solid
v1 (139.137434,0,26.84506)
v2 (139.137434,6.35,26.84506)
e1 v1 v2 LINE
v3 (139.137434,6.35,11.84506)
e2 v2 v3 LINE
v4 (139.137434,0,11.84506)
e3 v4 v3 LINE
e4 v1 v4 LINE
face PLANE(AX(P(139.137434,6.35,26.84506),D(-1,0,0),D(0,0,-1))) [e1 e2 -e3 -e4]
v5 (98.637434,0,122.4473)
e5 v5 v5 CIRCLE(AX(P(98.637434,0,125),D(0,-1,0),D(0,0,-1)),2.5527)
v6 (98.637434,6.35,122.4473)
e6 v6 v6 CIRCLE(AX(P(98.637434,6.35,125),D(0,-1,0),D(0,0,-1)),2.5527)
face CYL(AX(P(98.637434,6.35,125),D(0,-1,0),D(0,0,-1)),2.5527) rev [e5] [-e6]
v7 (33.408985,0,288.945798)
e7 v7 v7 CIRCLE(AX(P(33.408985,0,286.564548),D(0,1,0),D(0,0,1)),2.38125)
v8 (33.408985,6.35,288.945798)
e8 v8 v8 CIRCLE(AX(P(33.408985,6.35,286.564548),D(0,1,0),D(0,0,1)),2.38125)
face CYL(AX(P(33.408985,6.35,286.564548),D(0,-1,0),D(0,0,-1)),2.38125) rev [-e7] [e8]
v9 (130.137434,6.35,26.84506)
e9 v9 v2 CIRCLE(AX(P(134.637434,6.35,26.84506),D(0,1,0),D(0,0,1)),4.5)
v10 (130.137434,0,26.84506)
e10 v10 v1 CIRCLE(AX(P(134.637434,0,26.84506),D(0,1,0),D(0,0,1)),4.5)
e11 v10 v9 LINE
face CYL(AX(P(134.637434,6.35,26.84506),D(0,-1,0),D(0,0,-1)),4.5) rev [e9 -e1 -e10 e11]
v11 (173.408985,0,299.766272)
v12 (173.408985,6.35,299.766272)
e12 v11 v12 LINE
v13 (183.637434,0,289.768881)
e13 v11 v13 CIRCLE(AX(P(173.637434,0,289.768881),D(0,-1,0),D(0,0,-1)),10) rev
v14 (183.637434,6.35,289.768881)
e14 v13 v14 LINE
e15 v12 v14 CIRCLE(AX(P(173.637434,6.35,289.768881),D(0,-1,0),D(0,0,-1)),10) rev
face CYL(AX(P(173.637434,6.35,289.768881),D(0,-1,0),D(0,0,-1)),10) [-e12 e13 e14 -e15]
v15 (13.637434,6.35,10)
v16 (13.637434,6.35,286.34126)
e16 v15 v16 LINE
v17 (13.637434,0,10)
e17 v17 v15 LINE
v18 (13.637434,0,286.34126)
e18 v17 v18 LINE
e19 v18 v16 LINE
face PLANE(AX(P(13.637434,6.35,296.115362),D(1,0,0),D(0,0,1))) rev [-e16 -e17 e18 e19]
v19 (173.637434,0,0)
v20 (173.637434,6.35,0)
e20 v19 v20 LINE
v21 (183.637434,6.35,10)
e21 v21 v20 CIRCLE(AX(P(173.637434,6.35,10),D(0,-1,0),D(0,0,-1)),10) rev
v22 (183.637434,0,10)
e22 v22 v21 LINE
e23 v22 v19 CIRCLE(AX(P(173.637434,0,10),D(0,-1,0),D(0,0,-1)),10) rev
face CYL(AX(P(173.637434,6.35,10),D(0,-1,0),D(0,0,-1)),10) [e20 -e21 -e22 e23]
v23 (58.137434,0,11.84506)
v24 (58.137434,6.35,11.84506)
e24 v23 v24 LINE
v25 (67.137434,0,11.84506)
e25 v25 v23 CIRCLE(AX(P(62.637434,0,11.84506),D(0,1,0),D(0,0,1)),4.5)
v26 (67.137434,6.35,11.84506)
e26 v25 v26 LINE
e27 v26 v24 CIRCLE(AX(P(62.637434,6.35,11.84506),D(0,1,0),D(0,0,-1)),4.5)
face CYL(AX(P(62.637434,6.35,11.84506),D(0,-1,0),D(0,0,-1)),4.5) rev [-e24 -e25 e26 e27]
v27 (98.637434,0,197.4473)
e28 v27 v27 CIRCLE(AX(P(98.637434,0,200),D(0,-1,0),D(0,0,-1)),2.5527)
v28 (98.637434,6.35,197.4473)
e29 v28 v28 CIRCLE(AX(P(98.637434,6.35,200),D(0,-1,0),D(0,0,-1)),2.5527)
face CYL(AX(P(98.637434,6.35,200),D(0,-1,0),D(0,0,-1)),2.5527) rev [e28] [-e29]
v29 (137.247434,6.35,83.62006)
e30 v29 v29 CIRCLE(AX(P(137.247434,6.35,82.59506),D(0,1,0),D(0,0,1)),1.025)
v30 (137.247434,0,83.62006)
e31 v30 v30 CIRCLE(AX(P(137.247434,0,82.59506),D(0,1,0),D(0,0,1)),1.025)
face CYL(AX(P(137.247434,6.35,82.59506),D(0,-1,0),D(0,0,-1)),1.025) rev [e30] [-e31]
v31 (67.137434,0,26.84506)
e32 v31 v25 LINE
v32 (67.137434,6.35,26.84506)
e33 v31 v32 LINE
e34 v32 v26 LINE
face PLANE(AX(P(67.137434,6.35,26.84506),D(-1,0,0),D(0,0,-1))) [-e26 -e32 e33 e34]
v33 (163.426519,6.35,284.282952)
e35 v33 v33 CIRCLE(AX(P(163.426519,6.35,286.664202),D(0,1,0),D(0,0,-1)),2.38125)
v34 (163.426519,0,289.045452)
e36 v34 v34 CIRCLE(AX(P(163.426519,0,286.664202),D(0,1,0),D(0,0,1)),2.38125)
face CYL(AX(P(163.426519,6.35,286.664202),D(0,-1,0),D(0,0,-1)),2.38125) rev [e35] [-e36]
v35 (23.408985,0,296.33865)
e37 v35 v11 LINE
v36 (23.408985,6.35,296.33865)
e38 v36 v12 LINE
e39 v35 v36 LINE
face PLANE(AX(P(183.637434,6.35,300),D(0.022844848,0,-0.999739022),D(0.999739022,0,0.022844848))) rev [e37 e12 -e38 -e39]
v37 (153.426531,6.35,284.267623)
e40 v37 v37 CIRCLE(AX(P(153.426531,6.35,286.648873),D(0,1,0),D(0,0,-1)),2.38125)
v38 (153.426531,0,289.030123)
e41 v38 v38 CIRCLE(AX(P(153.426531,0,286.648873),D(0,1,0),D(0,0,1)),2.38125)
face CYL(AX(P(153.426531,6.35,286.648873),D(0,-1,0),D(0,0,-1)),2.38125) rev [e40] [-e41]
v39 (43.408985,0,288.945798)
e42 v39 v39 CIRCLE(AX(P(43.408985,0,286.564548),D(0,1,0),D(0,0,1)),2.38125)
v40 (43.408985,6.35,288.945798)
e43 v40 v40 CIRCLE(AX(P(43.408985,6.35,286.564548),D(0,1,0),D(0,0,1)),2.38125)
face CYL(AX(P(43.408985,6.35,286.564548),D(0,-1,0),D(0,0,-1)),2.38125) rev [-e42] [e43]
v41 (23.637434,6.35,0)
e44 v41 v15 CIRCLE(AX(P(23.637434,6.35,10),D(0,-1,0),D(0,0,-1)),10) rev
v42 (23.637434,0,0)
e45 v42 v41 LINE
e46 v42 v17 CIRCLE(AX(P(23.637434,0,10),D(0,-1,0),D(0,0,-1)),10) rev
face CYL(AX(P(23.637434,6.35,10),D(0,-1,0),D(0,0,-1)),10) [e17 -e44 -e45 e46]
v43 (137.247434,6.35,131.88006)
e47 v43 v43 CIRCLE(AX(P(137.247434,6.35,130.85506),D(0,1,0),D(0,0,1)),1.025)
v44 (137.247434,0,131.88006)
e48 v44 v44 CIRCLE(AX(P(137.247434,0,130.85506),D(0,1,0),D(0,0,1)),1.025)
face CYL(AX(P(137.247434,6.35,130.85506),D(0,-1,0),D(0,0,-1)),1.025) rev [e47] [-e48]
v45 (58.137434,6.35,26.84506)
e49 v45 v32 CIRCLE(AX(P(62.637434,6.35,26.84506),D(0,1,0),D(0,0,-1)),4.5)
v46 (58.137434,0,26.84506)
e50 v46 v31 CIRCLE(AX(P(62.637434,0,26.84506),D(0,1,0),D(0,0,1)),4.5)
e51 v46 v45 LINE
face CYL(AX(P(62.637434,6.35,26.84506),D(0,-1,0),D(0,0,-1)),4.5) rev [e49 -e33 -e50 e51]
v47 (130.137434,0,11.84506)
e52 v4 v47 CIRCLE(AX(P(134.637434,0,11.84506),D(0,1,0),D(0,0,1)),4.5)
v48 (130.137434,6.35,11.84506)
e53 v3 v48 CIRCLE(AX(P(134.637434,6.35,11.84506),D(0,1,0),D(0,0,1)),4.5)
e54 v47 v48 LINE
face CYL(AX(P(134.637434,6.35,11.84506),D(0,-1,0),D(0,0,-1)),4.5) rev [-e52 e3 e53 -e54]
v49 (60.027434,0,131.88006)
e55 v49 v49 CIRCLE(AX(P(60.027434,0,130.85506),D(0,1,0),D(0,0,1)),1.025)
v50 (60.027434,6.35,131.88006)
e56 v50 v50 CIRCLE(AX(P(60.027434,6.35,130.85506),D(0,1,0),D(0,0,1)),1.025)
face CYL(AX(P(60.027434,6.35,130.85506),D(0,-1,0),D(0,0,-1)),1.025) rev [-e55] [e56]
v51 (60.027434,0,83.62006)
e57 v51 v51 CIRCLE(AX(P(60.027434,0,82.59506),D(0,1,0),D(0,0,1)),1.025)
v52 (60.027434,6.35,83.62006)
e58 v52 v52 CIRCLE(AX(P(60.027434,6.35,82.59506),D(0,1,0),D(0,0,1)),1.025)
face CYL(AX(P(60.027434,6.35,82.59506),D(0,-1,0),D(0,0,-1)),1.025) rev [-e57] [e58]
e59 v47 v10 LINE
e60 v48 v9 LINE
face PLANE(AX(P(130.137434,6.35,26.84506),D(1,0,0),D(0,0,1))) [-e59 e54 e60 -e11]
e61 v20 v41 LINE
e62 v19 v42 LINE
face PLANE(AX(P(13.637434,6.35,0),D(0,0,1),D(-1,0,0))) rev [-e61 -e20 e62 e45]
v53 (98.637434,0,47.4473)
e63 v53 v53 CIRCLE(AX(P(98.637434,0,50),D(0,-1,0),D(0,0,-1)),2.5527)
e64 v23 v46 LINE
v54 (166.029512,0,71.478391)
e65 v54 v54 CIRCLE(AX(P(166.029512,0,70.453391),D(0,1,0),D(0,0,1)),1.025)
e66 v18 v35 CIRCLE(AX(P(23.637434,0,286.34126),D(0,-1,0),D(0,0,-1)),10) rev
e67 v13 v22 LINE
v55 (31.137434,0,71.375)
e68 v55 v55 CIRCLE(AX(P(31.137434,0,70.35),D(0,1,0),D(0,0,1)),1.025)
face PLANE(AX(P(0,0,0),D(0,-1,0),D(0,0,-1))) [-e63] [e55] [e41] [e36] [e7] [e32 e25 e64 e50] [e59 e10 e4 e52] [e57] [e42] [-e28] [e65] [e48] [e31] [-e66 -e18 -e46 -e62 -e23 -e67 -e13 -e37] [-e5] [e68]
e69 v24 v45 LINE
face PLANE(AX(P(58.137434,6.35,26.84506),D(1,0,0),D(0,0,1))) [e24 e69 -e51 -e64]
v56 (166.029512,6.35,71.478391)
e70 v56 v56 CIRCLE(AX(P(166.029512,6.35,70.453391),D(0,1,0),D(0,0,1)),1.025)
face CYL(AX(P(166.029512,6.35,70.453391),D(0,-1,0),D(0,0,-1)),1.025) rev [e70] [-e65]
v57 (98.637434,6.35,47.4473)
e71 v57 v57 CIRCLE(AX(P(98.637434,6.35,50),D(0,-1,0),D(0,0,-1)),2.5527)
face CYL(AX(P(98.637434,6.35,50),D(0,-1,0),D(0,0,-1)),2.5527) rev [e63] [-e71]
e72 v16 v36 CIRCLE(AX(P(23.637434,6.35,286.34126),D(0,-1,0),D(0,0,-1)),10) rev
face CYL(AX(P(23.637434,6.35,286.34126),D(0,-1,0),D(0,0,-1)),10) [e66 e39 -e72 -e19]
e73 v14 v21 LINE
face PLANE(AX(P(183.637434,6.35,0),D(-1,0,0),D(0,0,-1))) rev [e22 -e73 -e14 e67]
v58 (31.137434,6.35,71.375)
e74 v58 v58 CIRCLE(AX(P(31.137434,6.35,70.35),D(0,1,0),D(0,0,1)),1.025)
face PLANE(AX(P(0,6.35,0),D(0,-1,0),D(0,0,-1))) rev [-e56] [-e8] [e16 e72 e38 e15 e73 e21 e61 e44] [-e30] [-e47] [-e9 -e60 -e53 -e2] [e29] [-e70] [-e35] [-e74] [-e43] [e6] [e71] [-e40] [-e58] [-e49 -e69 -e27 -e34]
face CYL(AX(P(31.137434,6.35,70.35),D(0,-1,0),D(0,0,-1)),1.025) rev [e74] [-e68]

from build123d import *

# Parameters (mm, degrees)
PLATE_DEPTH                          = 6.35
FILLET1_R                            = 10
TRIPOD_SOCKET_TAP_DRILL_FOR_1_4_20_D = 5.1054
CAMERA_MOUNT_SCREW_CLEARANCE_DEPTH   = 352.602633461
ALIGNMENT_TAP_DRILL_FOR_M2_5_D       = 2.05
CLAMP_TAP_DRILL_FOR_M2_5_D           = 2.05
SKETCH11_R                           = 2.38125
CABLE_TIES_HOLES_DEPTH               = 352.602633461


with BuildPart() as part:
    # Sketch1 → plate (new body)
    with BuildSketch(Plane(origin=(0, 0, 0), x_dir=(1, 0, 0), z_dir=(0, 1, 0))):
        Polygon((13.637433785, 0), (183.637433785, 0), (183.637433785, -300), (13.637433785, -296.115361978), align=None)
    extrude(amount=PLATE_DEPTH)

    # Fillet1
    fillet1_edges = [part.edges().sort_by_distance(p)[0] for p in [
        (13.637433785, 3.175, 0),
        (183.637433785, 3.175, 0),
        (183.637433785, 3.175, 300),
        (13.637433785, 3.175, 296.115361978),
    ]]
    fillet(fillet1_edges, radius=FILLET1_R)

    # tripod socket Tap Drill for 1/4-20 (through all)
    with Locations(Plane(origin=(0, 0, 0), x_dir=(-1, 0, 0), z_dir=(0, -1, 0))):
        with Locations((-98.637433785, -50), (-98.637433785, -125), (-98.637433785, -200)):
            Hole(TRIPOD_SOCKET_TAP_DRILL_FOR_1_4_20_D / 2)

    # Sketch6 → camera mount screw clearance (cut, through all)
    with BuildSketch(Plane(origin=(0, 6.35, 0), x_dir=(1, 0, 0), z_dir=(0, 1, 0))):
        with BuildLine():
            Line((130.137433785, -26.845059814), (130.137433785, -11.845059814))
            ThreePointArc((130.137433785, -11.845059814), (134.637433785, -7.345059814), (139.137433785, -11.845059814))
            Line((139.137433785, -11.845059814), (139.137433785, -26.845059814))
            ThreePointArc((139.137433785, -26.845059814), (134.637433785, -31.345059814), (130.137433785, -26.845059814))
        make_face()
        with BuildLine():
            Line((58.137433785, -26.845059814), (58.137433785, -11.845059814))
            ThreePointArc((58.137433785, -11.845059814), (62.637433785, -7.345059814), (67.137433785, -11.845059814))
            Line((67.137433785, -11.845059814), (67.137433785, -26.845059814))
            ThreePointArc((67.137433785, -26.845059814), (62.637433785, -31.345059814), (58.137433785, -26.845059814))
        make_face()
    extrude(amount=-CAMERA_MOUNT_SCREW_CLEARANCE_DEPTH, mode=Mode.SUBTRACT)

    # alignment Tap Drill for M2.5 (through all)
    with Locations(Plane(origin=(0, 6.35, 0), x_dir=(1, 0, 0), z_dir=(0, 1, 0))):
        with Locations((60.027433785, -82.595059814), (137.247433785, -82.595059814), (137.247433785, -130.855059814), (60.027433785, -130.855059814)):
            Hole(ALIGNMENT_TAP_DRILL_FOR_M2_5_D / 2)

    # clamp Tap Drill for M2.5 (through all)
    with Locations(Plane(origin=(0, 6.35, 0), x_dir=(1, 0, 0), z_dir=(0, 1, 0))):
        with Locations((31.137433785, -70.35), (166.029512109, -70.453390828)):
            Hole(CLAMP_TAP_DRILL_FOR_M2_5_D / 2)

    # Sketch11 → cable ties holes (cut, through all)
    with BuildSketch(Plane(origin=(0, 6.35, 0), x_dir=(1, 0, 0), z_dir=(0, 1, 0))):
        with Locations(Location((33.408985301, -286.564547525, 0), (0, 0, 270))):
            Circle(SKETCH11_R)
        with Locations(Location((43.408985301, -286.564547525, 0), (0, 0, 270))):
            Circle(SKETCH11_R)
        with Locations(Location((153.426530966, -286.648872752, 0), (0, 0, 270))):
            Circle(SKETCH11_R)
        with Locations(Location((163.426519217, -286.664202157, 0), (0, 0, 270))):
            Circle(SKETCH11_R)
    extrude(amount=-CABLE_TIES_HOLES_DEPTH, mode=Mode.SUBTRACT)


solid = part.part
